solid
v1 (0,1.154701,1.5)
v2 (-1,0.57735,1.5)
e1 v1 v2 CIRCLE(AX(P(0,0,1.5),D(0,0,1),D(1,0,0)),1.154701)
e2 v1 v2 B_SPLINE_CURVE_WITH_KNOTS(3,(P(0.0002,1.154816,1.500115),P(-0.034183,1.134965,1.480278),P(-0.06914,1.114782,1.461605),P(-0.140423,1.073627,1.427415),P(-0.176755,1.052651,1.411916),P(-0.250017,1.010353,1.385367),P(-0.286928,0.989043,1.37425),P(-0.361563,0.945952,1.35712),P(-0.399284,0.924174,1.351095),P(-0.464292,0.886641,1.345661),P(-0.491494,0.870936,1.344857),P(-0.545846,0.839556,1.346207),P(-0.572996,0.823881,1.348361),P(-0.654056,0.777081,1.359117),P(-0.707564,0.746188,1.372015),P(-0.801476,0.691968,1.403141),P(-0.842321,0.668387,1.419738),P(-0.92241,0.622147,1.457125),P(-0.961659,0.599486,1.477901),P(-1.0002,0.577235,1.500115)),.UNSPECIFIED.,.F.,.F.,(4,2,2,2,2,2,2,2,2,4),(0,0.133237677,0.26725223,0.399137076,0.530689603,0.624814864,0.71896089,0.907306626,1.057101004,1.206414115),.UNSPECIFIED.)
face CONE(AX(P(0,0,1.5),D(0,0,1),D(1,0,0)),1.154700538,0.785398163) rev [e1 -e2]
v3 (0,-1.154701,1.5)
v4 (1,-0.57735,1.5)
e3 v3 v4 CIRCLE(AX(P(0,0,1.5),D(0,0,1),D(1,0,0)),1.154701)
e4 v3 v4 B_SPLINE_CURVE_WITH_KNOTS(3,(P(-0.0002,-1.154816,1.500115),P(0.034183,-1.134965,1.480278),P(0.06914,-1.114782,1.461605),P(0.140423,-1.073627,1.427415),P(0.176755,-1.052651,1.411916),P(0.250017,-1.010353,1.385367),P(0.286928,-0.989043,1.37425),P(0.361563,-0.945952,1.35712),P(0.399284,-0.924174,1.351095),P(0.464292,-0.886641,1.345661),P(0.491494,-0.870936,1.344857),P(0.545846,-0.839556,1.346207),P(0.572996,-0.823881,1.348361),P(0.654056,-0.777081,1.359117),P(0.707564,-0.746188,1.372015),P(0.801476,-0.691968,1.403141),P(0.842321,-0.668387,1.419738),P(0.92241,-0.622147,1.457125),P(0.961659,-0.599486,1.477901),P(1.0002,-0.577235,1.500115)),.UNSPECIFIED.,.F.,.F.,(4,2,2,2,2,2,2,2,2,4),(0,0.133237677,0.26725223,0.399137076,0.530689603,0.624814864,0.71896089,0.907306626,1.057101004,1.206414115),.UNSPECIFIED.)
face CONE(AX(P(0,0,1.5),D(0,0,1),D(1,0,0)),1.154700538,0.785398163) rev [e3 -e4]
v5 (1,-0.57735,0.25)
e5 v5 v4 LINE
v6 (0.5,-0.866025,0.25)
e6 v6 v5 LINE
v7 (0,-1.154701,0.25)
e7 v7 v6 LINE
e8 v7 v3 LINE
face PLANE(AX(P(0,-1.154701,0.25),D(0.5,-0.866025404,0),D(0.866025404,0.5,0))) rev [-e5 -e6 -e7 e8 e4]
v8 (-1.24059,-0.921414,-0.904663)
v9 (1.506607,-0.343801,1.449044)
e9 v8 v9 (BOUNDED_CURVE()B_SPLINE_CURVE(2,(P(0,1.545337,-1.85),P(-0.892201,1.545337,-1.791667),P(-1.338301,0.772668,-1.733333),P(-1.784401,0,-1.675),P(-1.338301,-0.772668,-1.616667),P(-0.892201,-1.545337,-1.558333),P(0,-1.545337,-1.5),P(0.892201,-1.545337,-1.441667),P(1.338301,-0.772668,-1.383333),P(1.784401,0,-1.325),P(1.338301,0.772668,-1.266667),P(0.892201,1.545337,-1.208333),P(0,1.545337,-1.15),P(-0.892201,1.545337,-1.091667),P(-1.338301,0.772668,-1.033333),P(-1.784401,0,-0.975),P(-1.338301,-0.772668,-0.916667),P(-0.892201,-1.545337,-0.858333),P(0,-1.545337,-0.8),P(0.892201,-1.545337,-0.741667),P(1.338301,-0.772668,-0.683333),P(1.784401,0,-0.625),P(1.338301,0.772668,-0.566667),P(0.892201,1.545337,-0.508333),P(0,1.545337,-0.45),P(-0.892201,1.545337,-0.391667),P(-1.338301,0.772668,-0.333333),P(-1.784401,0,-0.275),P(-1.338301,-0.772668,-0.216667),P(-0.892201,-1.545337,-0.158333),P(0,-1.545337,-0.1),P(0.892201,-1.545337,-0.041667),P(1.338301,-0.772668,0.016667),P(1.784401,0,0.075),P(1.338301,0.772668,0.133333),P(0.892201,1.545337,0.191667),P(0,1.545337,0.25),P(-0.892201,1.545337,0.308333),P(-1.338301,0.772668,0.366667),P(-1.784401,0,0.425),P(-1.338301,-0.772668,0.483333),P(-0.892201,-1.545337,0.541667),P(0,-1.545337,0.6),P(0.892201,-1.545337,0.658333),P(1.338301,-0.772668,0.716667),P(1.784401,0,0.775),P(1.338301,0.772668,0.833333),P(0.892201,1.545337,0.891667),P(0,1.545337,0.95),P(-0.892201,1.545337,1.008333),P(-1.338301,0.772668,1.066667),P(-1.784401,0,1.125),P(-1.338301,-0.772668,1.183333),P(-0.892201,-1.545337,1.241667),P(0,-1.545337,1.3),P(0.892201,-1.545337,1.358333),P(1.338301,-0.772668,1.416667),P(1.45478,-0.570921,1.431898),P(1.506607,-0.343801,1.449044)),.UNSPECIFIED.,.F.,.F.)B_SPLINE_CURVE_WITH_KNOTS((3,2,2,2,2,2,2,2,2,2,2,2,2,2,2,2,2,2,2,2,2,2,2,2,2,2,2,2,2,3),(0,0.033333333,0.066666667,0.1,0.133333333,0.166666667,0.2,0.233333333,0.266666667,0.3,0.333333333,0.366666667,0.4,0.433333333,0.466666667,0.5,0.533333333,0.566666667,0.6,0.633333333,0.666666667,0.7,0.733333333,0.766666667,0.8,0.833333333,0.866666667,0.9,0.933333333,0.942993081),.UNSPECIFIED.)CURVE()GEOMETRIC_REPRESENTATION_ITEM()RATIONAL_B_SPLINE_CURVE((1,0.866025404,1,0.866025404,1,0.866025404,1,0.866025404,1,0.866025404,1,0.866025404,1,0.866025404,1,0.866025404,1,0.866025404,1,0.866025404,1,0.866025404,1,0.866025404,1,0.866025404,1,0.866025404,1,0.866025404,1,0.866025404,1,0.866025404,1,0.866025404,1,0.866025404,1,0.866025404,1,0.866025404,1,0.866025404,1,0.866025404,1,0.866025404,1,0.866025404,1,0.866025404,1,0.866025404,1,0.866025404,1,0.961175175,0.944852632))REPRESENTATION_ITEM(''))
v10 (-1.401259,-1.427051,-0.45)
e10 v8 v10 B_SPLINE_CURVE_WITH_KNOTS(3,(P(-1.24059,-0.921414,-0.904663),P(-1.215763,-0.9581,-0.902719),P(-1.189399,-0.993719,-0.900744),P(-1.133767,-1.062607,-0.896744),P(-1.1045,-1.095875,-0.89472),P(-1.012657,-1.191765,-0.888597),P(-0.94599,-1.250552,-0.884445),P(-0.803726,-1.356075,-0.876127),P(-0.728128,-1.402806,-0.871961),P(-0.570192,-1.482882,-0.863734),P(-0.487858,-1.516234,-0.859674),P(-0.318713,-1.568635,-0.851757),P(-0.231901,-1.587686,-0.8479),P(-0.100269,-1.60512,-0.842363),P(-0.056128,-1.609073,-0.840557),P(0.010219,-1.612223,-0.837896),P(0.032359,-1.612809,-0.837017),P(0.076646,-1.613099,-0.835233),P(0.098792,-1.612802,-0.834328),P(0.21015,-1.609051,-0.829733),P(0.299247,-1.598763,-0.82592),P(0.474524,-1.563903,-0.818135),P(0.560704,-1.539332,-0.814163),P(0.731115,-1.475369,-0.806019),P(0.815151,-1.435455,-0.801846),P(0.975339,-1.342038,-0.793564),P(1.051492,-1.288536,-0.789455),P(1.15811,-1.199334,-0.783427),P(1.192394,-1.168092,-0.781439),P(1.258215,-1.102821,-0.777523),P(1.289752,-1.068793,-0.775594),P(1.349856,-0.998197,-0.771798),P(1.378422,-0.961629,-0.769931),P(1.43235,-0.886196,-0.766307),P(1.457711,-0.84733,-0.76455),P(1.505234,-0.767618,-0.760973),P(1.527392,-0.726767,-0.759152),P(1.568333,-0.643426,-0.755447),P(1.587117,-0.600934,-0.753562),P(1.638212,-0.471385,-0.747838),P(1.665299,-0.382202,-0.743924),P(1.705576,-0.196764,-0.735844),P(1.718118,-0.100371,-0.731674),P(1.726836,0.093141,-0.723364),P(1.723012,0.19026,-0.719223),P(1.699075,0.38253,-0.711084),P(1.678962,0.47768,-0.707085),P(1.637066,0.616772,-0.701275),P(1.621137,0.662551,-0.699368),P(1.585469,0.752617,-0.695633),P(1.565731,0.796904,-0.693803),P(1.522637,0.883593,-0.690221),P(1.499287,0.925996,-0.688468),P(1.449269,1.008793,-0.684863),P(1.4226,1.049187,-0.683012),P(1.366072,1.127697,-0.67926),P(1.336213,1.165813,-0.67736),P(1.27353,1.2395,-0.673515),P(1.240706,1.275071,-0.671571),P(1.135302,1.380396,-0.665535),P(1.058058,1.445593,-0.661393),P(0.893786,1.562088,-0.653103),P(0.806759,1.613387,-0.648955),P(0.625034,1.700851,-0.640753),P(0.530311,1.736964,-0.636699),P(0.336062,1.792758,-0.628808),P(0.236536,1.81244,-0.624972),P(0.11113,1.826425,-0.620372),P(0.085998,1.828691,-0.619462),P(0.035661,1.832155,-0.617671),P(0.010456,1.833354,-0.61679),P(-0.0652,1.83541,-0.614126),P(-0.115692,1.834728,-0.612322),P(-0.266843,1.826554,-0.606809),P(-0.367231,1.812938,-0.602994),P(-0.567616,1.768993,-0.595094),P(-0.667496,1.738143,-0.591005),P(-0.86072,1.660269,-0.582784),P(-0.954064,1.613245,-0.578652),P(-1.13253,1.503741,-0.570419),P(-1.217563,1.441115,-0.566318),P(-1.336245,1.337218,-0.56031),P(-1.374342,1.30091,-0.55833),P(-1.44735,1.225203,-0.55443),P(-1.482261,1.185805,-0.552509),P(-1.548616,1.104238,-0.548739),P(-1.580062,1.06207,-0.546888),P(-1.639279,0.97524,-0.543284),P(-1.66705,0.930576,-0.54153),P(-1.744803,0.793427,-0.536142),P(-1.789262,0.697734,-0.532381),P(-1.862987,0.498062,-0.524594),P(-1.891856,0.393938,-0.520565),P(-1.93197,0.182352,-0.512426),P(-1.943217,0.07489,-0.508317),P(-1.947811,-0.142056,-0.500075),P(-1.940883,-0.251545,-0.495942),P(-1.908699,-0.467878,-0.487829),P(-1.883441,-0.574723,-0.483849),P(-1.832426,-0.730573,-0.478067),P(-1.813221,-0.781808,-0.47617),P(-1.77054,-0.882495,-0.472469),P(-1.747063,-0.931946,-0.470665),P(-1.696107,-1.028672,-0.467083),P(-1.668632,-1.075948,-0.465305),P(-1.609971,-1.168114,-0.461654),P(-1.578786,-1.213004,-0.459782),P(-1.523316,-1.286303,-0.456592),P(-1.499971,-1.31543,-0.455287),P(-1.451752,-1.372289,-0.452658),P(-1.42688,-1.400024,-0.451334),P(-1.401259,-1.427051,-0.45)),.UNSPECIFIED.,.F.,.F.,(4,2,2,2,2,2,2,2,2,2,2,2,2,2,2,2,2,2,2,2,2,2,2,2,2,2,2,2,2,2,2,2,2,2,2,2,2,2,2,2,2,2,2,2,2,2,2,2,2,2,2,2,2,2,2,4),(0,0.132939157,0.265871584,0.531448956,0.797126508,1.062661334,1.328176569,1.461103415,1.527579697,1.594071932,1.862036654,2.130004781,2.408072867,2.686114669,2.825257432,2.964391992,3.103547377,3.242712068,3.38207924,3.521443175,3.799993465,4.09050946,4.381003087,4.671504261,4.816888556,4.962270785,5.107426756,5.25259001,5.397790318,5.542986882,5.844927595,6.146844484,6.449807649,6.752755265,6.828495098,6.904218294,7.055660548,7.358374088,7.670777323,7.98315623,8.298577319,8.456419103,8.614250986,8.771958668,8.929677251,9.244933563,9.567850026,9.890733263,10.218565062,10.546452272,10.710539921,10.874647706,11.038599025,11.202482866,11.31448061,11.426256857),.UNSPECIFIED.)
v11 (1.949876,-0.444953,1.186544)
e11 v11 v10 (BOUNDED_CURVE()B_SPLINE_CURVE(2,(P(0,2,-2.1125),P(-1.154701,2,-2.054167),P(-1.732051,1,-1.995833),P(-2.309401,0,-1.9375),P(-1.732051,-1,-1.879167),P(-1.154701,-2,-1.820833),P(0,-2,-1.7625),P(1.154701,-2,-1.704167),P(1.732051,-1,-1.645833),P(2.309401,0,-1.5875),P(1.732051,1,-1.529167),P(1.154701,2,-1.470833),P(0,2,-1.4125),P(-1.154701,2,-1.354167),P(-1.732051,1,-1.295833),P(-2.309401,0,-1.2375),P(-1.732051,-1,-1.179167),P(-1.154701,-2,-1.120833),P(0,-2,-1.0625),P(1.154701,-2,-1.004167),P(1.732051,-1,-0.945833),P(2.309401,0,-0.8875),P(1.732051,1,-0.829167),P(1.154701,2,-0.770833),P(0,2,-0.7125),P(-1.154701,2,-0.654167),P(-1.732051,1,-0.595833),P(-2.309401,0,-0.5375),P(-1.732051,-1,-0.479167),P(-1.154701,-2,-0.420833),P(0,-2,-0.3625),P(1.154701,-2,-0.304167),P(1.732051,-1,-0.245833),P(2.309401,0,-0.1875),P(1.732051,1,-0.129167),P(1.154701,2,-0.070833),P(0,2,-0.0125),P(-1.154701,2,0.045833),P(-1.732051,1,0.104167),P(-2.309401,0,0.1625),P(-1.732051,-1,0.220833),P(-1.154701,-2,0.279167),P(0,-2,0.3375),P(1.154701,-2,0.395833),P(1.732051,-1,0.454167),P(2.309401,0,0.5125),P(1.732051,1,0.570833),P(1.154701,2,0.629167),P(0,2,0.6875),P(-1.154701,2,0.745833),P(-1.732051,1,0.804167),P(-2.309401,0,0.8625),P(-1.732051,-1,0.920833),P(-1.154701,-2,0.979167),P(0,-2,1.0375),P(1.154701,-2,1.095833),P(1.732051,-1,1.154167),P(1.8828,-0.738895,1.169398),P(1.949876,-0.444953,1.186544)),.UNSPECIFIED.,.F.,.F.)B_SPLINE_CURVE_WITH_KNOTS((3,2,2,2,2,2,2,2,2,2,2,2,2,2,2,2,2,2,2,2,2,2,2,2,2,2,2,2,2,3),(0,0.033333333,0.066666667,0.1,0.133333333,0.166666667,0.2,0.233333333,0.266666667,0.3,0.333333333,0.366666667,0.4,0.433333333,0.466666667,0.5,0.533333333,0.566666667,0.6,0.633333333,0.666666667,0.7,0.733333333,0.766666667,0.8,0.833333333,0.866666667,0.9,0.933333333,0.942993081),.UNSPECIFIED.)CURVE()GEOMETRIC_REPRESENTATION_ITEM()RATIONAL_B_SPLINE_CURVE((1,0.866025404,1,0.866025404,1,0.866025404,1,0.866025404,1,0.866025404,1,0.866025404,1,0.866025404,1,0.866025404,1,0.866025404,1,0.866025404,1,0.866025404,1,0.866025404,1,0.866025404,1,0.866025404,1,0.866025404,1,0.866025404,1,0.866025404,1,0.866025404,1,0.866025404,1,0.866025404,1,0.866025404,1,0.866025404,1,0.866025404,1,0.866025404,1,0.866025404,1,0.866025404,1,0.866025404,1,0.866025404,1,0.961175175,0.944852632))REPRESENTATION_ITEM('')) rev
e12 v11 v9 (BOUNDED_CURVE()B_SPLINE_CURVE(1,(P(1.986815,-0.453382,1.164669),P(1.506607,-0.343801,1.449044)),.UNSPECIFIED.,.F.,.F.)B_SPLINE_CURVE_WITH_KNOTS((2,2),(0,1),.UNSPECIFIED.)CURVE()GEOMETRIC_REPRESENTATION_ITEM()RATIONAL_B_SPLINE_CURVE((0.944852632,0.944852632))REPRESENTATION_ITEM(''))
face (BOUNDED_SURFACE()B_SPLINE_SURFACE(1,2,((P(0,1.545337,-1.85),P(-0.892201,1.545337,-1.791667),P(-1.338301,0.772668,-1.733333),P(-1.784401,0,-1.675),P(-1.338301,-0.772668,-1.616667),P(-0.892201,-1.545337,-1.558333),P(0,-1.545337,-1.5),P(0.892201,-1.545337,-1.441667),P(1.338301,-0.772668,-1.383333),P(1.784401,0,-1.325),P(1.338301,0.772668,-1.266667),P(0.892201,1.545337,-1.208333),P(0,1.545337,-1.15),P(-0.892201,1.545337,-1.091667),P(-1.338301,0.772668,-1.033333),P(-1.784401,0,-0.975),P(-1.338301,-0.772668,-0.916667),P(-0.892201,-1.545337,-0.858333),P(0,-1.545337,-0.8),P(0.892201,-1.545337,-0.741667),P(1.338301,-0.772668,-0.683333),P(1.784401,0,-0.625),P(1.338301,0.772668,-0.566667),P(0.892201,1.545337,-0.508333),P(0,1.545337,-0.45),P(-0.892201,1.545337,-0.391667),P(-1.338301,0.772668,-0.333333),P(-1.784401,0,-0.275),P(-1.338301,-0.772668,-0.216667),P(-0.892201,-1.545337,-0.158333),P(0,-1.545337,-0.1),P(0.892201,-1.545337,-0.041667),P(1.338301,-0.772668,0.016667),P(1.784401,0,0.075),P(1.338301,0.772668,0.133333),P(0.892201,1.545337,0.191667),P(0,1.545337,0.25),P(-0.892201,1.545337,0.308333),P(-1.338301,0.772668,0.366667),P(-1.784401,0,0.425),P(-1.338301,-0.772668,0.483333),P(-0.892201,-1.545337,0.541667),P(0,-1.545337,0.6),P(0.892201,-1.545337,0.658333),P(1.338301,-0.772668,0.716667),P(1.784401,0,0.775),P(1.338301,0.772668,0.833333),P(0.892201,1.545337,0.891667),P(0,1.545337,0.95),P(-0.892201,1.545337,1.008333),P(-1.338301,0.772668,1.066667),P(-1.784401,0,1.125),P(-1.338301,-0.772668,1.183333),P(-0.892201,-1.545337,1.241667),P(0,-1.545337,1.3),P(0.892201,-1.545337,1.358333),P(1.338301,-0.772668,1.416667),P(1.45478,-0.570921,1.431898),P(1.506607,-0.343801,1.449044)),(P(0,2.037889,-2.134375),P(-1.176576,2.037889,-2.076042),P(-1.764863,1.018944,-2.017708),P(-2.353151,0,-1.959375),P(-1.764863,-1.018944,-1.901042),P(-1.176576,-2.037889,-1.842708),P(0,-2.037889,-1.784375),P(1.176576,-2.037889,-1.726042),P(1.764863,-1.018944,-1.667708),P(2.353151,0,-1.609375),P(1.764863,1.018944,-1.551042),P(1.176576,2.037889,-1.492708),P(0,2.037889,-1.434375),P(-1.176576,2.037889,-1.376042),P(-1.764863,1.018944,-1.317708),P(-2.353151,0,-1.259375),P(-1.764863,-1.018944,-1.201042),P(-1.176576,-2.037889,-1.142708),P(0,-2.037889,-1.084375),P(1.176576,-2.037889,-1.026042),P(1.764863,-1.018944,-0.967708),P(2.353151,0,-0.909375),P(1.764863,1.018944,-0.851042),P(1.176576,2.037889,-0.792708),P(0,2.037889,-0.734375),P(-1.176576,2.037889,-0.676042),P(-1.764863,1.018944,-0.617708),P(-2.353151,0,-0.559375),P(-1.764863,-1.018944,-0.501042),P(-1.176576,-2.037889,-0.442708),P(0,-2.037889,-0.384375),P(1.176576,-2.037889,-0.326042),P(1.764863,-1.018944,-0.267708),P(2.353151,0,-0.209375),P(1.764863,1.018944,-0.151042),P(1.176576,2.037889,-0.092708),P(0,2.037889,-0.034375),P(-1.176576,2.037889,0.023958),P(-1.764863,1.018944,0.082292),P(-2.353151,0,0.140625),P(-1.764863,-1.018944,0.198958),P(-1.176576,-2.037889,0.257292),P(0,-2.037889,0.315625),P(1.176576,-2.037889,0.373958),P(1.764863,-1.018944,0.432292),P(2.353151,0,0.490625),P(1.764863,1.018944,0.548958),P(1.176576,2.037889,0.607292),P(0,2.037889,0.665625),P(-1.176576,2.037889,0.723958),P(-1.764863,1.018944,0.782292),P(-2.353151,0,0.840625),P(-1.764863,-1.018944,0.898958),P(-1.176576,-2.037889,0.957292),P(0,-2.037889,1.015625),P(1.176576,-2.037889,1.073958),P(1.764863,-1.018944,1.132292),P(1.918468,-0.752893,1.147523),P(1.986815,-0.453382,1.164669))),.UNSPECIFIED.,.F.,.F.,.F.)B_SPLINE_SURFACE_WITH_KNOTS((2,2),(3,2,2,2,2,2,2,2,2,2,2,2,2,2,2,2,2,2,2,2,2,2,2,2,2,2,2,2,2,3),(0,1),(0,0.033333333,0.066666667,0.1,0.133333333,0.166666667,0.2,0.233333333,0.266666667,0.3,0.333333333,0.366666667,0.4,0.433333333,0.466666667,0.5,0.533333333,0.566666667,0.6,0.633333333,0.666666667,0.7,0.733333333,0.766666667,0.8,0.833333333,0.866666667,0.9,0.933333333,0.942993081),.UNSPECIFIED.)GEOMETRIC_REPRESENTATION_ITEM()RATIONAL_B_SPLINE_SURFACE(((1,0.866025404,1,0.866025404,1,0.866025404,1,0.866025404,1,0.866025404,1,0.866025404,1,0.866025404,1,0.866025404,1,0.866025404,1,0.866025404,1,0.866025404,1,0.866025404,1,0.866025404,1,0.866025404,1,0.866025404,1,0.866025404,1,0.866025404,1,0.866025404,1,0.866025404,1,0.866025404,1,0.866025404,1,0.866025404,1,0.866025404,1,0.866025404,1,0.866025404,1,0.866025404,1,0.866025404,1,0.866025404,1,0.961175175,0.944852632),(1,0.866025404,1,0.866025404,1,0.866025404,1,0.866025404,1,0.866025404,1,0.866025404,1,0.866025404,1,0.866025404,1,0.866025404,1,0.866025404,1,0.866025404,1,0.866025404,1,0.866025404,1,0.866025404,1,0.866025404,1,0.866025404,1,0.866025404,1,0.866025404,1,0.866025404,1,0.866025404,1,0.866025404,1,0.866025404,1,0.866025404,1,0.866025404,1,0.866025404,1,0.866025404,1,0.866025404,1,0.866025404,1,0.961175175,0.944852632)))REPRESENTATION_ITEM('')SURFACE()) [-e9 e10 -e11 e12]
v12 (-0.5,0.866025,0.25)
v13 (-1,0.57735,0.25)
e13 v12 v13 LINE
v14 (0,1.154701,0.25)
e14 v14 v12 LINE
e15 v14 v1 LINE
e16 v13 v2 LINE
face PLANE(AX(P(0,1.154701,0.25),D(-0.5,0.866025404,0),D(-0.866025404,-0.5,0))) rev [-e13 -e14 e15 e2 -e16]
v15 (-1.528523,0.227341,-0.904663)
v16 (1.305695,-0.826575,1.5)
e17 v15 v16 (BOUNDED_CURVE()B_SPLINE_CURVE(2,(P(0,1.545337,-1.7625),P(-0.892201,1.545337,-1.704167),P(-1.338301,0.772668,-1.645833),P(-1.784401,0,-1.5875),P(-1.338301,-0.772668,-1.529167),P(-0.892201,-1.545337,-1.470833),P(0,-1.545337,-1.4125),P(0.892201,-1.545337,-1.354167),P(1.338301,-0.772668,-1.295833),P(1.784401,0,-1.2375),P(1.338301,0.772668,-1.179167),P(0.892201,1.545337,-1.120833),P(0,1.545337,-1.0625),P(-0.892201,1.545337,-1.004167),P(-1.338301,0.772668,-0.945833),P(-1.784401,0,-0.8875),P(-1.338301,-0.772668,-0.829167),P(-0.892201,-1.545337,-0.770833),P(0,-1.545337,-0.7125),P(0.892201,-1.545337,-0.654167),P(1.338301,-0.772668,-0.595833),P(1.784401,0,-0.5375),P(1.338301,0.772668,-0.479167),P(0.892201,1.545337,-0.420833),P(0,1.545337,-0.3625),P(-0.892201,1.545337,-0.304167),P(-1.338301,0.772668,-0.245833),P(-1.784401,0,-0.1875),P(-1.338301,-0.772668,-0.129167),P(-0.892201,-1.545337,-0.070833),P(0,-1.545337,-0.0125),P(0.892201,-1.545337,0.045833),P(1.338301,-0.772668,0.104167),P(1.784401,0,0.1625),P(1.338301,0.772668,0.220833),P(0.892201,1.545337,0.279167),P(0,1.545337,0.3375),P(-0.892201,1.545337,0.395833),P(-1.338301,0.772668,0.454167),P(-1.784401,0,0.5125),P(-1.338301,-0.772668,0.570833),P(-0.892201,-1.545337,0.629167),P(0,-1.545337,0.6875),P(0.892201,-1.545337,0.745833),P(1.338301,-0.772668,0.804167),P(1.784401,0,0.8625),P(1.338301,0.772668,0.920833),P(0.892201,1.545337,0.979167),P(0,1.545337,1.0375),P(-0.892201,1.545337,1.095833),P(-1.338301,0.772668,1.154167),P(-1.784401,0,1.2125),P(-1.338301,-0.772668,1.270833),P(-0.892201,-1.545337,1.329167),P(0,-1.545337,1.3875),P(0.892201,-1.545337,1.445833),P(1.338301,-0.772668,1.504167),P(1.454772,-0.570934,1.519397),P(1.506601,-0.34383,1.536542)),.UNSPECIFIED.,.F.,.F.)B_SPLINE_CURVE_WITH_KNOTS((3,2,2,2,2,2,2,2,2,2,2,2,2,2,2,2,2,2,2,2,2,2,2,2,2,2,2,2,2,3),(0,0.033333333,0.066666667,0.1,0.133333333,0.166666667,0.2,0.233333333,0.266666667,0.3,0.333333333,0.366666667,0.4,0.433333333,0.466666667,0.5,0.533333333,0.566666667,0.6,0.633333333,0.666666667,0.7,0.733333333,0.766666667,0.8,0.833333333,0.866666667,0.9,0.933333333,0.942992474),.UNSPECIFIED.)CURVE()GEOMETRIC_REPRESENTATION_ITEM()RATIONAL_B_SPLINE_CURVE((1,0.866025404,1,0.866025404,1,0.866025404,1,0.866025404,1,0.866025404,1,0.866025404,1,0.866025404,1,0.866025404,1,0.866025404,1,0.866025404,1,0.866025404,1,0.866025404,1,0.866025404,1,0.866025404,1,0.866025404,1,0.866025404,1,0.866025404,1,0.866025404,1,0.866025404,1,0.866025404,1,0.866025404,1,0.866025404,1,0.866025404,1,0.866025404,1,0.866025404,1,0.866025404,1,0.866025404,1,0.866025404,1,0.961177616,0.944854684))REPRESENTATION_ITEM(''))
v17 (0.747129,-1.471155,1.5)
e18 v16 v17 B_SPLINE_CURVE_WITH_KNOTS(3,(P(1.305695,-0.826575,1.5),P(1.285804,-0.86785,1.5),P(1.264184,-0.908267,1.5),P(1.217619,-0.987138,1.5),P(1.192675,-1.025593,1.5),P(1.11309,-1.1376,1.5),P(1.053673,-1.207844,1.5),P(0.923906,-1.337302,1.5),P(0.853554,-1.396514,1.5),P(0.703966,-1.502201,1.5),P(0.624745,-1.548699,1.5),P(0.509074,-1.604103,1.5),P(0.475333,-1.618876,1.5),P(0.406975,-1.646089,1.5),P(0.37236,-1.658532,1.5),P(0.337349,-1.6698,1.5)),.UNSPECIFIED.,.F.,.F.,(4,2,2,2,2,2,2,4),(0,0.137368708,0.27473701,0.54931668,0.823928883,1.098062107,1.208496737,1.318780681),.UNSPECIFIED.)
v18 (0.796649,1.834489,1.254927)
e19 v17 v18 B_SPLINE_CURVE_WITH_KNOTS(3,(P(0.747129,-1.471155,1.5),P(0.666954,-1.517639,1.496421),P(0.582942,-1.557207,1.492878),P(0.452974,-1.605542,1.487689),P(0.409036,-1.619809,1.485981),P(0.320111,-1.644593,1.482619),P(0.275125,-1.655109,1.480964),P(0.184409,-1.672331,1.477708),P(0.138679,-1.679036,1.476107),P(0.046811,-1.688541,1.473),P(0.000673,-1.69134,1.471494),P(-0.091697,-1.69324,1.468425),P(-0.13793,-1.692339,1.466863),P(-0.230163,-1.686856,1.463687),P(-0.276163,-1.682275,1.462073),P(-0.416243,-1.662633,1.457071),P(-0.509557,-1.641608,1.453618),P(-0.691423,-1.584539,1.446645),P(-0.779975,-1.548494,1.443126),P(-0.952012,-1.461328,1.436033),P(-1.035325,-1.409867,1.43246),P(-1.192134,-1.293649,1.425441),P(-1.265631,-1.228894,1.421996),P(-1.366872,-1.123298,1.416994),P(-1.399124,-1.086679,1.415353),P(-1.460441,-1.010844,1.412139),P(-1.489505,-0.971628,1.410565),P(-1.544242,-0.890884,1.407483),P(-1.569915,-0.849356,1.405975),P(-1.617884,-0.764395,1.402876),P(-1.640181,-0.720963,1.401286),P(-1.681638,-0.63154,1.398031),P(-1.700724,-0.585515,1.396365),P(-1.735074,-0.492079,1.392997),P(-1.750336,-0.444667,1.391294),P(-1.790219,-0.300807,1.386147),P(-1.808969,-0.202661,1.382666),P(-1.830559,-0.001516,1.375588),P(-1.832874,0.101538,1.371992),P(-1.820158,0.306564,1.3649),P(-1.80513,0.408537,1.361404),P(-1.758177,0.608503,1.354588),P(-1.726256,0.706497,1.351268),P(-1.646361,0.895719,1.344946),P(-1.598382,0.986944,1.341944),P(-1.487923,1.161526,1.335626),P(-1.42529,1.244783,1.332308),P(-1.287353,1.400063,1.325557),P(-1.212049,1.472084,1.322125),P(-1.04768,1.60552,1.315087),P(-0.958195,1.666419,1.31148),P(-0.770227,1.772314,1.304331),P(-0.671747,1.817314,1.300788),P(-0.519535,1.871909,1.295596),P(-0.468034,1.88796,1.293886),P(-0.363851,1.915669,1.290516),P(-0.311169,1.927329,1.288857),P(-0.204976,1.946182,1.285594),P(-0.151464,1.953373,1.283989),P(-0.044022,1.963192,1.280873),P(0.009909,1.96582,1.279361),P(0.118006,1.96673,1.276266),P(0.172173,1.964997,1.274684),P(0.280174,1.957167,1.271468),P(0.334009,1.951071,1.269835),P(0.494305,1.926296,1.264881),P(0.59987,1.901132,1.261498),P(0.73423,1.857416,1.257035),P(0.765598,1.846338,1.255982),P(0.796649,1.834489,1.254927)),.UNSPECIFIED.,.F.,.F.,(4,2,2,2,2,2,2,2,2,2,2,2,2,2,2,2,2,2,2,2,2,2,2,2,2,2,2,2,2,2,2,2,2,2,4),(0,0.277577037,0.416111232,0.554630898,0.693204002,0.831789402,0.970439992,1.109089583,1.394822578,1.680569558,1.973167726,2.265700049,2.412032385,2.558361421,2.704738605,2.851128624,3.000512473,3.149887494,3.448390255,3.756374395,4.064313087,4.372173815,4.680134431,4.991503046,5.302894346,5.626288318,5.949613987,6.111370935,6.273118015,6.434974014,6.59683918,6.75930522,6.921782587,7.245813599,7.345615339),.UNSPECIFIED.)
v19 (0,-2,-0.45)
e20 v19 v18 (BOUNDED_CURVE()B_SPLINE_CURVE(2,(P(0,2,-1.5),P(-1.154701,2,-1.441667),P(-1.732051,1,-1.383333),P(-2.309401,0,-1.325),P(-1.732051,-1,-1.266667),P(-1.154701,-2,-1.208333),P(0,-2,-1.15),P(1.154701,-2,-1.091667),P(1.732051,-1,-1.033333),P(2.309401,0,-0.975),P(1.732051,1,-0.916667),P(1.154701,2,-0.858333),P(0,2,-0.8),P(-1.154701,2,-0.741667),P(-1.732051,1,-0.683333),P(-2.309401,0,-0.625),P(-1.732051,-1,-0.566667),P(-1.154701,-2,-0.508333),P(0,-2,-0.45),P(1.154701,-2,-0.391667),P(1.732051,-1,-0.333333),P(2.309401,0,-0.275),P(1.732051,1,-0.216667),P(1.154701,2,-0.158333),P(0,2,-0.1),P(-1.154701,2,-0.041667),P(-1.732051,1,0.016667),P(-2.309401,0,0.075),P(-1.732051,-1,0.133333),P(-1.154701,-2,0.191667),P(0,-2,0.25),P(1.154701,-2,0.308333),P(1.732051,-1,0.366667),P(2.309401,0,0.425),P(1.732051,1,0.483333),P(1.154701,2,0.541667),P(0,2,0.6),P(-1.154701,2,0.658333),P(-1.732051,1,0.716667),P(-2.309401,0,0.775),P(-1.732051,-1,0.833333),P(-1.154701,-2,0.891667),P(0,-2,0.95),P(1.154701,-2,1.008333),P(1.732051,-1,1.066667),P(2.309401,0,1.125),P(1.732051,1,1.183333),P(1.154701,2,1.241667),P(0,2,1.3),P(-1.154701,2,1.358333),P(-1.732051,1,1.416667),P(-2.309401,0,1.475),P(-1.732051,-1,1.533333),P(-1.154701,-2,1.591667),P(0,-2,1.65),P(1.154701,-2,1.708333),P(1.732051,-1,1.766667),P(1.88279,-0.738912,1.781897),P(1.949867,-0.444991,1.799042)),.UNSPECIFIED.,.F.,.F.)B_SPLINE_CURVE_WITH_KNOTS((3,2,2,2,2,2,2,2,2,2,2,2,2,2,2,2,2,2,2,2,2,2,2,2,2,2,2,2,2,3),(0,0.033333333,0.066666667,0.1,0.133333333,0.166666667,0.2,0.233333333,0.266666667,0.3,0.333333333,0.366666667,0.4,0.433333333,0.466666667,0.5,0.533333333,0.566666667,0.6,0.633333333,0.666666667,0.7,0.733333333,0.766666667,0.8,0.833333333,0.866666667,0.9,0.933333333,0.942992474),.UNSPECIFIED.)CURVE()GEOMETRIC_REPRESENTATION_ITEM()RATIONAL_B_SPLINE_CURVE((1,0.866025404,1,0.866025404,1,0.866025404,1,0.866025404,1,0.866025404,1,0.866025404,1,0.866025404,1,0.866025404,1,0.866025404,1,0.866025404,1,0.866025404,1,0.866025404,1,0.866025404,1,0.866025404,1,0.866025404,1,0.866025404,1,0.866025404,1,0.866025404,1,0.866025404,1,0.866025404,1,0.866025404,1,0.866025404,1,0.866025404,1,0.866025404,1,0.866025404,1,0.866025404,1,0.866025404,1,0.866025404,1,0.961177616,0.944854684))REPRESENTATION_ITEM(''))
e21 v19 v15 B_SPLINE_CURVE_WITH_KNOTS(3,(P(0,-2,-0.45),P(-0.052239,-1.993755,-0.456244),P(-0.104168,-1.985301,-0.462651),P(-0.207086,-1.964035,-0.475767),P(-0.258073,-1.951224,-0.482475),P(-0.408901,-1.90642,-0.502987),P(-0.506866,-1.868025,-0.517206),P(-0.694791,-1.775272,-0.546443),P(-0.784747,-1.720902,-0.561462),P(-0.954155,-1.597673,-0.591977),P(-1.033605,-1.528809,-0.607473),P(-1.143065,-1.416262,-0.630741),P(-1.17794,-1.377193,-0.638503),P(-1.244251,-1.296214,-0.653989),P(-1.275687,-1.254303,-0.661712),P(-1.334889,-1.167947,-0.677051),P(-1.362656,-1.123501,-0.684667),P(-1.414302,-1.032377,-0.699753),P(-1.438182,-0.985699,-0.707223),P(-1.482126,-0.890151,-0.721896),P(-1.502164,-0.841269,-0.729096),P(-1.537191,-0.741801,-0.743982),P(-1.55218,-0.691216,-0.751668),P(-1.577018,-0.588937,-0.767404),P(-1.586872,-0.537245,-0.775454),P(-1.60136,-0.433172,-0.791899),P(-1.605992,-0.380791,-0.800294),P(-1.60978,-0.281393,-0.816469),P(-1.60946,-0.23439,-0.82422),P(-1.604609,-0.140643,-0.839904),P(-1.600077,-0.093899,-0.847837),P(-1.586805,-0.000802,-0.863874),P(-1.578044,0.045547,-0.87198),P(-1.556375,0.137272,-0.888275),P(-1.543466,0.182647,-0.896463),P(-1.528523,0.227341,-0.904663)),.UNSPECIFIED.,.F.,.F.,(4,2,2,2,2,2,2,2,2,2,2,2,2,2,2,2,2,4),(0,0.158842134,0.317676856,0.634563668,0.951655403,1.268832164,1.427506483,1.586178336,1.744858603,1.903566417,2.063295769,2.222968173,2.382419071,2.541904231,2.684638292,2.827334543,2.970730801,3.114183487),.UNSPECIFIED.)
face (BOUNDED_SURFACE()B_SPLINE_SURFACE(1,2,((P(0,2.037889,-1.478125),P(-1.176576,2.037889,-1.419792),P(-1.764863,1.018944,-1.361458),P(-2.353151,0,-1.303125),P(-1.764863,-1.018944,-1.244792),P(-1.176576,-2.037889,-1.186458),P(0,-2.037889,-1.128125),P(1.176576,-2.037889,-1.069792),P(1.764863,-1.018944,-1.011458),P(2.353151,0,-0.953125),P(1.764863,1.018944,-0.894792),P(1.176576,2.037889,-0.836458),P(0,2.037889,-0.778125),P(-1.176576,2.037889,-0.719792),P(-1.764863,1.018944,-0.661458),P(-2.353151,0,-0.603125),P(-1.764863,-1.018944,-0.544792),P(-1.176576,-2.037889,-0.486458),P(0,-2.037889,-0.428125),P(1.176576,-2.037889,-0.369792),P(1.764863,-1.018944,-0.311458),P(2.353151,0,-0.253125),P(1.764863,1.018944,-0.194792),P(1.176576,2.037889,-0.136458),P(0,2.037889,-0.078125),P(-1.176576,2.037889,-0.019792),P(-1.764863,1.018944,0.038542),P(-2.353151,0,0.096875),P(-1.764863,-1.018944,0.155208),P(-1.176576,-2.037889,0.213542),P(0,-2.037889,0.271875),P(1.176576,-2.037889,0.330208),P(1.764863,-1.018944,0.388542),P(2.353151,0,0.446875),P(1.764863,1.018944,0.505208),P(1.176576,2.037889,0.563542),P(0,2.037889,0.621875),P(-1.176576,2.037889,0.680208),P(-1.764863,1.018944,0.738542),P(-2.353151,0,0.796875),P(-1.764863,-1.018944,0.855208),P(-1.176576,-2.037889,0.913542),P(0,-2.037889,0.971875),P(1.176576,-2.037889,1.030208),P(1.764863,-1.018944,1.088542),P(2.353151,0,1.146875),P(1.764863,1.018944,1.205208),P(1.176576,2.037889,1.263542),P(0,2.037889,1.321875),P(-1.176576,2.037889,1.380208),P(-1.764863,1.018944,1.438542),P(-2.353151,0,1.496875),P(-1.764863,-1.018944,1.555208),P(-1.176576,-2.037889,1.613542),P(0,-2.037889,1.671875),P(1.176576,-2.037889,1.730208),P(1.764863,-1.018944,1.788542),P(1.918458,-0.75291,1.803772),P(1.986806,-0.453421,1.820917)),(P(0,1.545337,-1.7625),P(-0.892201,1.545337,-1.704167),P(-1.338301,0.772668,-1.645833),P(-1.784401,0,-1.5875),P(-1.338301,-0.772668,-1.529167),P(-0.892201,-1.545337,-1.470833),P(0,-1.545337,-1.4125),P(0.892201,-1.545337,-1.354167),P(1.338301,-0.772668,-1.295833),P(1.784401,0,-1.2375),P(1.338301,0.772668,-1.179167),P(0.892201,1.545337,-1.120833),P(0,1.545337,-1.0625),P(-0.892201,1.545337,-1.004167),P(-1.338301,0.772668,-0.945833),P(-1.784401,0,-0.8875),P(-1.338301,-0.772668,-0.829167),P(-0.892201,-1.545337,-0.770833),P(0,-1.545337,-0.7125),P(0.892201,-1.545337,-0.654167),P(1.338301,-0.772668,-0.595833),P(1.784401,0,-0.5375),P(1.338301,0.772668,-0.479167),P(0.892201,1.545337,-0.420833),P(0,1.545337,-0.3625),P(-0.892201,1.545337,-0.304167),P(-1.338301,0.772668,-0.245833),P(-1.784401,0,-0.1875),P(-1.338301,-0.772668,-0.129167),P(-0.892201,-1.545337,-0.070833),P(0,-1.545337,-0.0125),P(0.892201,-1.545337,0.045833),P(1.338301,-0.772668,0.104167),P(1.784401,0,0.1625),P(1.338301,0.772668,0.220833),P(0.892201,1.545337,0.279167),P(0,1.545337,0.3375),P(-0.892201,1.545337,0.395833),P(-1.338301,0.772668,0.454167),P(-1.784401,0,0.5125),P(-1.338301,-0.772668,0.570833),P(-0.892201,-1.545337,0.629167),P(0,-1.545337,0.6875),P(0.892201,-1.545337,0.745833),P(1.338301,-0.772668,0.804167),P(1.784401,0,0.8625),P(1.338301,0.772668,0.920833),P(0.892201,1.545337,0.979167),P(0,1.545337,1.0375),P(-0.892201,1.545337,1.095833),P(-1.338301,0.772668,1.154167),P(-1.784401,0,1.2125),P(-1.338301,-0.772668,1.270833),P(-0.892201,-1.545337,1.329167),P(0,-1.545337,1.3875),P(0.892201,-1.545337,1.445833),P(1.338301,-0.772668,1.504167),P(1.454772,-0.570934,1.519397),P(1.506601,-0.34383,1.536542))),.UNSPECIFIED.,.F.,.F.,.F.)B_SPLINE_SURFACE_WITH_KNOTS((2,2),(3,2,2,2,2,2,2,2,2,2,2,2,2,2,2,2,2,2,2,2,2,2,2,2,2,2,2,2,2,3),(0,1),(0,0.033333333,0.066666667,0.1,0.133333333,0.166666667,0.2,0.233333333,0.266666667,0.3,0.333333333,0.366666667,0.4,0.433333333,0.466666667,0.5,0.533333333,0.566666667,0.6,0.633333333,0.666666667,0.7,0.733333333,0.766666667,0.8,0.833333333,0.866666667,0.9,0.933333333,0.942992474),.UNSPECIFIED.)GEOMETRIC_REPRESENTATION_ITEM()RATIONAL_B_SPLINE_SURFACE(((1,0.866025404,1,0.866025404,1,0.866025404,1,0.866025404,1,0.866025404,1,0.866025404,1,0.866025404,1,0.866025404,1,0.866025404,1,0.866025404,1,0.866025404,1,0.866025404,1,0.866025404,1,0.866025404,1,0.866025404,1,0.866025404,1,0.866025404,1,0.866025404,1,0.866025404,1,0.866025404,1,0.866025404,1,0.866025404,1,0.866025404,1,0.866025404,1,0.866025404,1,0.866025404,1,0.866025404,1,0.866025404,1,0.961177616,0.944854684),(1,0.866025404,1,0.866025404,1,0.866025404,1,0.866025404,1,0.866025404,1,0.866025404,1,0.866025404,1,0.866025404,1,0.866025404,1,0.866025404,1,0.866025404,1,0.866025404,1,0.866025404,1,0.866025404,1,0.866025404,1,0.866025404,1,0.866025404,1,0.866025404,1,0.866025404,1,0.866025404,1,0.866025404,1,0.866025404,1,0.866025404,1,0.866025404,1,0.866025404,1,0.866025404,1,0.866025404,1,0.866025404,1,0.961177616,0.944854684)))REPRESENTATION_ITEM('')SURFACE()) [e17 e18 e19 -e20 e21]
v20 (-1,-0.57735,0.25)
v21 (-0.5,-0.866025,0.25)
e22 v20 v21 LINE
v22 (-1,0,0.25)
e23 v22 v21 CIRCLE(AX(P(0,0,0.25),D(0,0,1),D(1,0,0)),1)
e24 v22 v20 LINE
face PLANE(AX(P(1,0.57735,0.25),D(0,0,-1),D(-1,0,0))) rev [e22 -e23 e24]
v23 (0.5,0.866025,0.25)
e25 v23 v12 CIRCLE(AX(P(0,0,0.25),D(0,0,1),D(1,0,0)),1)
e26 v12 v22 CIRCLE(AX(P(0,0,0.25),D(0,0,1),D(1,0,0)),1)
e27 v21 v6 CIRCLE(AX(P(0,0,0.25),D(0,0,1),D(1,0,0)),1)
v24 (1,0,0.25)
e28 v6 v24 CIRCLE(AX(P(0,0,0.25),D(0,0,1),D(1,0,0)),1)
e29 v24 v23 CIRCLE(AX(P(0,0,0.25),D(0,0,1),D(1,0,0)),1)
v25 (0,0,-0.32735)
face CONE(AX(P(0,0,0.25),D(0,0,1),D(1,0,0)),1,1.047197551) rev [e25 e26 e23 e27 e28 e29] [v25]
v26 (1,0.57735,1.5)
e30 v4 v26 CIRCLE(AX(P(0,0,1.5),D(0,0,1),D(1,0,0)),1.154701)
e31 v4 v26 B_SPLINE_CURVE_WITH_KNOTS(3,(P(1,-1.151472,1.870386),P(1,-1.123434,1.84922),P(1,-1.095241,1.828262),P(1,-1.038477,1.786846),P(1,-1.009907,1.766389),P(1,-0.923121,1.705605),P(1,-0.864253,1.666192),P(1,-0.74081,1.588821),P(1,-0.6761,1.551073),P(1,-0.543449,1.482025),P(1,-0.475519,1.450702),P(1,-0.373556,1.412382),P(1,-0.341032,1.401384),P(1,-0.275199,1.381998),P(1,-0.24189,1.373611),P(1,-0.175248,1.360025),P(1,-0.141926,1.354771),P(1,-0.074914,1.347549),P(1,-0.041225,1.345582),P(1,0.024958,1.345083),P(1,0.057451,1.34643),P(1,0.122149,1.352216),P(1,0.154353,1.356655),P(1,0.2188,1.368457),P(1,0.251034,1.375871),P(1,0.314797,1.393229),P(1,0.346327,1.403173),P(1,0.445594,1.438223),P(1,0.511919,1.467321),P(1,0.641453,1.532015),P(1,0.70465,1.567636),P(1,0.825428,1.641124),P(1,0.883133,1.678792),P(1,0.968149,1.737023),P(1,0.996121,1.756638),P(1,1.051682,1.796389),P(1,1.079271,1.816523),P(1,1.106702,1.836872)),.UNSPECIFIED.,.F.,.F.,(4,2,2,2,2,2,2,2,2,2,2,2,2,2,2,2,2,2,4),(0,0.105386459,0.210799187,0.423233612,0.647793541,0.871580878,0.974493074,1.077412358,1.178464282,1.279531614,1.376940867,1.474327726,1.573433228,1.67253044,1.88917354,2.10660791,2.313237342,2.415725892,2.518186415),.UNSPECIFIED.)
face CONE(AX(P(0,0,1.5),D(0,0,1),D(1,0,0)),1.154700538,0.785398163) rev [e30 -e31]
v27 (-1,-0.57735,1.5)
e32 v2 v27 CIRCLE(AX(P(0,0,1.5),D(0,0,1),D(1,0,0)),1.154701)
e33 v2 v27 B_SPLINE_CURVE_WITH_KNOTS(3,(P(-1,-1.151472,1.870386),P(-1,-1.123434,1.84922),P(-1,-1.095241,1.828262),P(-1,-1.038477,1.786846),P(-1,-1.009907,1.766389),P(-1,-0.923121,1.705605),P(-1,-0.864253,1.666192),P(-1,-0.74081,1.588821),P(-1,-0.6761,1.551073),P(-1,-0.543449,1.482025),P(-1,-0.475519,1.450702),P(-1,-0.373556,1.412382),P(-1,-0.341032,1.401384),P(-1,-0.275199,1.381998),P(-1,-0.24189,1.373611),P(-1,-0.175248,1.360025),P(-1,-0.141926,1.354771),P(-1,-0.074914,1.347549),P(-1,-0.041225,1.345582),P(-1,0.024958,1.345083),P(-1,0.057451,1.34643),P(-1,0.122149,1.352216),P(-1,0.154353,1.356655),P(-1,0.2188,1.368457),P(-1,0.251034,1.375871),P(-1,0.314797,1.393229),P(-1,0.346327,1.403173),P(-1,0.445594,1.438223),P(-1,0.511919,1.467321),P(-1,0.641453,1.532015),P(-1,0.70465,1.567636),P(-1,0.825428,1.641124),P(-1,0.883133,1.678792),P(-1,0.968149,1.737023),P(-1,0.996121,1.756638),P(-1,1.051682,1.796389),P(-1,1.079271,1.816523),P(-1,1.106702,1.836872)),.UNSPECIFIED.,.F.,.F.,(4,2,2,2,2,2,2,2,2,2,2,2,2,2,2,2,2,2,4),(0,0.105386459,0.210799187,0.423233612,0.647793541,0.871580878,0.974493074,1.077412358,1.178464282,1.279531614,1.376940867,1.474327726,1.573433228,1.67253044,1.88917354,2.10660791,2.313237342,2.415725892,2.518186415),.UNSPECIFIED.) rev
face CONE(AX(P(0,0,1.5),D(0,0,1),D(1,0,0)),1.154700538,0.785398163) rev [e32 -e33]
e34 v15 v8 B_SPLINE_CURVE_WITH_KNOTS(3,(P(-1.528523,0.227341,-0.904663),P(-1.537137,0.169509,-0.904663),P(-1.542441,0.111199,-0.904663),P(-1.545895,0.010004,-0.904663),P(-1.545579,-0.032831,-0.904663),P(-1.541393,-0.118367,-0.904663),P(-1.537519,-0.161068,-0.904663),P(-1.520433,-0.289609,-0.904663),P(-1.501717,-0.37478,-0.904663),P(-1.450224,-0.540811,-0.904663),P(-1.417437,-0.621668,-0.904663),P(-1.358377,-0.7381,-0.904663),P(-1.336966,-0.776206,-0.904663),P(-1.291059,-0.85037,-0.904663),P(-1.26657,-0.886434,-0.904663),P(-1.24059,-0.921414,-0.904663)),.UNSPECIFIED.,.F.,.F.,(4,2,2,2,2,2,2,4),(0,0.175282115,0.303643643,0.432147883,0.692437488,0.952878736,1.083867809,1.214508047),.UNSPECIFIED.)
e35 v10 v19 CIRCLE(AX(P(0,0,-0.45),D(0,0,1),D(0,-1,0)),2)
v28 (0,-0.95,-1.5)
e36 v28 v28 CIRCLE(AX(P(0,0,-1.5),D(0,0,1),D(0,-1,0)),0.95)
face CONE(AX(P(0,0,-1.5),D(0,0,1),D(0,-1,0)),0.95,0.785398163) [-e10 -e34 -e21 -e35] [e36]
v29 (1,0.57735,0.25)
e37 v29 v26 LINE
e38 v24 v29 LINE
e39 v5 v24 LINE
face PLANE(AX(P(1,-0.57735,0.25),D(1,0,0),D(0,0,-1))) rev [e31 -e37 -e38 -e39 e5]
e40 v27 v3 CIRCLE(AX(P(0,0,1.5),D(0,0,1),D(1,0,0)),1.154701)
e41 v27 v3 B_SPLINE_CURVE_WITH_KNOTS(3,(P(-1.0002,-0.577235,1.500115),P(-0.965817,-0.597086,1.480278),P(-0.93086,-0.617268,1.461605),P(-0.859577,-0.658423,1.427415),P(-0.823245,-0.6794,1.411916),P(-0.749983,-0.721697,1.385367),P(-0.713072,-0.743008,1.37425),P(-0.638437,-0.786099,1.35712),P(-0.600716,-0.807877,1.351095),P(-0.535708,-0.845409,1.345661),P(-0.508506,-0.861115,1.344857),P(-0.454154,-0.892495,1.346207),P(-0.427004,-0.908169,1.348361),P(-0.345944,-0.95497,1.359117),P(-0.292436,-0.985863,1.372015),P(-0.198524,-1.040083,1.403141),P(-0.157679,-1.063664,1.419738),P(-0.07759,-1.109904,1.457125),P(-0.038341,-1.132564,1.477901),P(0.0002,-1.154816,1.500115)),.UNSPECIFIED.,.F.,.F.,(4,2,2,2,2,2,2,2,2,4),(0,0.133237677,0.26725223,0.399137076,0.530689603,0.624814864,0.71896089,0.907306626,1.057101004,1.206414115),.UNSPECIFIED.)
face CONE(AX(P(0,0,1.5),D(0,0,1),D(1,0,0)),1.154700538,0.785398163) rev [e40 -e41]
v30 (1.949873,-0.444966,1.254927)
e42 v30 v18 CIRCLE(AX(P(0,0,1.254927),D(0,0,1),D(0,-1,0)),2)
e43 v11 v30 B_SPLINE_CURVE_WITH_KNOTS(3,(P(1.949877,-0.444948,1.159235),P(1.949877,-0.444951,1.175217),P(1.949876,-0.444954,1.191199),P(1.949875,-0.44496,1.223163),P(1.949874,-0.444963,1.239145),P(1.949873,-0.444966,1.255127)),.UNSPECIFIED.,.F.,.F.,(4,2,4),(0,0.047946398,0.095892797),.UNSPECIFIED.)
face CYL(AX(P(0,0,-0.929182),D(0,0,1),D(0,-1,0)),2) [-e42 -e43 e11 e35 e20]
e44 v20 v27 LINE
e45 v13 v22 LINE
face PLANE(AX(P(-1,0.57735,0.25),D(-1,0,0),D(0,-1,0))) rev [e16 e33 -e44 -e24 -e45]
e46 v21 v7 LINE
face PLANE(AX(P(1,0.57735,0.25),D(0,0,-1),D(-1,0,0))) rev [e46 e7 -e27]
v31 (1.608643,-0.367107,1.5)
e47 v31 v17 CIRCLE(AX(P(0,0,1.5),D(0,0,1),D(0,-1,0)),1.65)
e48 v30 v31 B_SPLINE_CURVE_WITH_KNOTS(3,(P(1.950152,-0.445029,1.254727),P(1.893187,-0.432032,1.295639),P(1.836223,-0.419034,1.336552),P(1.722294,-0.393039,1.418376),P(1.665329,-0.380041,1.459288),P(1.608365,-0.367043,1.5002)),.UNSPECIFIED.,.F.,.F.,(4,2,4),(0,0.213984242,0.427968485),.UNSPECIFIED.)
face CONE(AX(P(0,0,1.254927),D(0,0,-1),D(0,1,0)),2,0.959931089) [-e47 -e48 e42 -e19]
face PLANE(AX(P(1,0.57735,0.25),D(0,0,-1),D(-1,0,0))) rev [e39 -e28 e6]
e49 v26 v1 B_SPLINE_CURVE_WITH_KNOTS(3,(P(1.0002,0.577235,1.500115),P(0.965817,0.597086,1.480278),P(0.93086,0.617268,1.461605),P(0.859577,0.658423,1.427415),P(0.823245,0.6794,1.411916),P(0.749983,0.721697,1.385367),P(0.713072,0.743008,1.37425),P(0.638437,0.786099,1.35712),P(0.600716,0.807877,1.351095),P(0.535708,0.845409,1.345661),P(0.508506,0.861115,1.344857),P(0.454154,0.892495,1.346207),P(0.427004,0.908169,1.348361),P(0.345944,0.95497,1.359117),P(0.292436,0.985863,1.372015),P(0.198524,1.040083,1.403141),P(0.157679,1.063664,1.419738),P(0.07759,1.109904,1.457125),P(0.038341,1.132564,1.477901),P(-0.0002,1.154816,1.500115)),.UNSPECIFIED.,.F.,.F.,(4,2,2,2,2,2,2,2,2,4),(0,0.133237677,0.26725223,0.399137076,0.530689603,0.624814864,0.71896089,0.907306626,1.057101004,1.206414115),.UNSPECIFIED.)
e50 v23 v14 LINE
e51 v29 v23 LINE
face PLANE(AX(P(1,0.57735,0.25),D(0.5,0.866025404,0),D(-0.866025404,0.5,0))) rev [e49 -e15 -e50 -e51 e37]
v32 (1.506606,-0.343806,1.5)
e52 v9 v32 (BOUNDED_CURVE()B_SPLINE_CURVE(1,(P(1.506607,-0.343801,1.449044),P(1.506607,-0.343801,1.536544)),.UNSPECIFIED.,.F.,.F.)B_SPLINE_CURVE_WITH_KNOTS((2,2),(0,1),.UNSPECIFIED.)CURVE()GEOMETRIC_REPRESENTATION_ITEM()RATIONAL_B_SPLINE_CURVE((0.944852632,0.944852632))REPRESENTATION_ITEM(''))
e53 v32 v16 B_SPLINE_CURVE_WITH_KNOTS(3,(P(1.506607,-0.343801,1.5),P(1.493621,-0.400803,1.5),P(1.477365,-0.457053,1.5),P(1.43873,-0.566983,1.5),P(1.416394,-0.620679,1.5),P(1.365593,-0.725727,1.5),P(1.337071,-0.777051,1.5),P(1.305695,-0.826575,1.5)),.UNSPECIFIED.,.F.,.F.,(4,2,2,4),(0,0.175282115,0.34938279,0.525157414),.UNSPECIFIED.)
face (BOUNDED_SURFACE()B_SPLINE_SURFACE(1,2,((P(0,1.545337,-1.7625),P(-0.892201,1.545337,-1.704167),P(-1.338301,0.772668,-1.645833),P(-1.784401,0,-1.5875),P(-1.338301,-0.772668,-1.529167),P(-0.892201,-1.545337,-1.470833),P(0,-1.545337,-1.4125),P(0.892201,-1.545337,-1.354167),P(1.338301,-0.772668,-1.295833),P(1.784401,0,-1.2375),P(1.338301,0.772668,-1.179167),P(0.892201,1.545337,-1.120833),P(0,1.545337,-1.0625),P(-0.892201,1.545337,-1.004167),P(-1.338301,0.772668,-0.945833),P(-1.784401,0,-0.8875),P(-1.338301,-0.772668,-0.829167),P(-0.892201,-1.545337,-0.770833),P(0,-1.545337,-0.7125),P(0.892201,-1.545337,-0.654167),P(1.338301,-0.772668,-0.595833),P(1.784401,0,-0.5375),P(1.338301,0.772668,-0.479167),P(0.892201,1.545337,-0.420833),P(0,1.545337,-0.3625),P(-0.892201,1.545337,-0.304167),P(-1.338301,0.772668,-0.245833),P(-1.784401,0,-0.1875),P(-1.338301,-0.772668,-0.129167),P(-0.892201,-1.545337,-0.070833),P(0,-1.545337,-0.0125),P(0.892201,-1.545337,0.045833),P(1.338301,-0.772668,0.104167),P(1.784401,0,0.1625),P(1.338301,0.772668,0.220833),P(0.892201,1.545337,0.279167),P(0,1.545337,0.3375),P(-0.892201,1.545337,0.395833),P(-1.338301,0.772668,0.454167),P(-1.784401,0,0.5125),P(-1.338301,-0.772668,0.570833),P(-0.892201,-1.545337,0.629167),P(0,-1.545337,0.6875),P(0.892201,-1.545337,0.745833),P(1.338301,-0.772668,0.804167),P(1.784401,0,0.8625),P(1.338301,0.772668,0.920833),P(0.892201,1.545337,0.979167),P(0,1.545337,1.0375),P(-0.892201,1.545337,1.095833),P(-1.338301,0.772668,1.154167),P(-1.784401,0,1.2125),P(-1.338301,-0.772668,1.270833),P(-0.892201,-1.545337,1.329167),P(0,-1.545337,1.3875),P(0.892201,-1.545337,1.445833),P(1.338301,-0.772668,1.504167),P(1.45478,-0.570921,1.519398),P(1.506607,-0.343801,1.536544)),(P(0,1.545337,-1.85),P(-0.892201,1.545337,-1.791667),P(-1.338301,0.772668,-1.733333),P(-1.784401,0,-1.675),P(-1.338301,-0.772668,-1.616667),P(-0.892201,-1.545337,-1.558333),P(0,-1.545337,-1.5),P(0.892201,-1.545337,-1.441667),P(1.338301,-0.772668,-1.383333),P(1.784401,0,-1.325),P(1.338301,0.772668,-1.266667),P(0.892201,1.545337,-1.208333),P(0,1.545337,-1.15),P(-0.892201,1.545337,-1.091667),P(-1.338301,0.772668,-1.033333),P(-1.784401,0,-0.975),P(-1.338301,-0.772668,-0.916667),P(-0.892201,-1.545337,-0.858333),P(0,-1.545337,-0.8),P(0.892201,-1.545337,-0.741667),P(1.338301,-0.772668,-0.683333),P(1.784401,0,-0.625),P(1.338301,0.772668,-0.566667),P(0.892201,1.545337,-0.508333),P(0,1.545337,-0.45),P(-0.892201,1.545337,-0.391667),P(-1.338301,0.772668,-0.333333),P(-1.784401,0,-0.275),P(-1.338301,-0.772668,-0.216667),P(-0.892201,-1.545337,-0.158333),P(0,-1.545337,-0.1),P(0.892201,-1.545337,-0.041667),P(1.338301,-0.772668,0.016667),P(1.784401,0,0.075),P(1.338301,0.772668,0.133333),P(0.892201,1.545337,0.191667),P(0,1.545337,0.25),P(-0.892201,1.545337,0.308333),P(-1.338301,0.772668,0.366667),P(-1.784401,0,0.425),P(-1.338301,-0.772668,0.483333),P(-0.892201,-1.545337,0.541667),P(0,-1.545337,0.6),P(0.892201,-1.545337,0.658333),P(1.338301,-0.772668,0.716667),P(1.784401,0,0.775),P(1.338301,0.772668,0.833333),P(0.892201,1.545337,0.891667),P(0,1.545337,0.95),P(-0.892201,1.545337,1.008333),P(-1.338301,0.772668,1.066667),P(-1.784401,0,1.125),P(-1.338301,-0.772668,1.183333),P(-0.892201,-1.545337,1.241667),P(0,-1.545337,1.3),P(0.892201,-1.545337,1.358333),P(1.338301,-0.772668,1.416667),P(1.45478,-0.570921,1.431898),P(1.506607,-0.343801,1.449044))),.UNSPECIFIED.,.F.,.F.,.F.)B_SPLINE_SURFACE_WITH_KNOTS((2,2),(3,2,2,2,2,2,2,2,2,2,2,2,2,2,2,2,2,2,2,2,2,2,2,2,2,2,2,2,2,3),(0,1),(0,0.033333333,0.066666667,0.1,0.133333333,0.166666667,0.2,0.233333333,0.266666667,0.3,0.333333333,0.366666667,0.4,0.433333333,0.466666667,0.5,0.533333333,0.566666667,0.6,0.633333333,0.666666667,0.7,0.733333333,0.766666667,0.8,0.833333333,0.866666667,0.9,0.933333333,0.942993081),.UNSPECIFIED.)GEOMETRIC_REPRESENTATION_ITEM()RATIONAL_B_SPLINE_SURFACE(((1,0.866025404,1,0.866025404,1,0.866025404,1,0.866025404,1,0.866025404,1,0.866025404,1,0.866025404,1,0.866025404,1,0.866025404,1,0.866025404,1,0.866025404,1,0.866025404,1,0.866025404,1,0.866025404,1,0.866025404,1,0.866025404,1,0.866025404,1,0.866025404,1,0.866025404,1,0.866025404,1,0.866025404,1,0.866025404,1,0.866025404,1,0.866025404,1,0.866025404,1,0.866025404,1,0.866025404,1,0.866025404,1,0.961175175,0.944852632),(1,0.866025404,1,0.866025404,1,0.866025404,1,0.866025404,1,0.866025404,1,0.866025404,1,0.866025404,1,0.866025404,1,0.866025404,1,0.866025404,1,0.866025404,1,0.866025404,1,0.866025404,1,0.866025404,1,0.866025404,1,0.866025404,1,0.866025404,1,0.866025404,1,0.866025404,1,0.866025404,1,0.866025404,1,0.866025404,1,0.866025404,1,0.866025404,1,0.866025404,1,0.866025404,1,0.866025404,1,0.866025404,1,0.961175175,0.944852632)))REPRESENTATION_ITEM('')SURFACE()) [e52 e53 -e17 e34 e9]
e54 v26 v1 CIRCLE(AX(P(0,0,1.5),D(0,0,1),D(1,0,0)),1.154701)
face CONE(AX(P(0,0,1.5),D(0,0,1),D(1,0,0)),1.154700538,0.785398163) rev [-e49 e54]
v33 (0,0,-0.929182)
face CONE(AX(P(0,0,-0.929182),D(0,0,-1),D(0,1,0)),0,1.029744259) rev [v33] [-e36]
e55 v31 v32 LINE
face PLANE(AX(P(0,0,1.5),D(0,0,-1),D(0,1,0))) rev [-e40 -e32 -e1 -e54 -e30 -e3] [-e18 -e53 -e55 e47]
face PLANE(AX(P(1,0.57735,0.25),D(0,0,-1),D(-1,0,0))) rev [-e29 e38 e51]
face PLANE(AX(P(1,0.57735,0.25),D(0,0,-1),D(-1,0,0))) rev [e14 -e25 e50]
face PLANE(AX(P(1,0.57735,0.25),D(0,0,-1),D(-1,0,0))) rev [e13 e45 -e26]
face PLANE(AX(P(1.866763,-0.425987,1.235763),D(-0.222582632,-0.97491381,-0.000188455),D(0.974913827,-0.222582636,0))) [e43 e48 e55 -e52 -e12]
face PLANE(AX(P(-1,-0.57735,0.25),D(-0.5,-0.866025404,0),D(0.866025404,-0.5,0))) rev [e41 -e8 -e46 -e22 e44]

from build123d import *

# Parameters (mm, degrees)
CUT_EXTRUDE1_DEPTH = 1.25
CUT_SWEEP1_PITCH   = 0.7


with BuildPart() as part:
    # Sketch11 → Revolve1 (revolve)
    with BuildSketch(Plane(origin=(0, 0, 0), x_dir=(0, 0, -1), z_dir=(1, 0, 0)), mode=Mode.PRIVATE) as revolve1_sk:
        Polygon((-1.5, 0), (-1.5, 1.65), (-1.254927362, 2), (0.45, 2), (1.5, 0.95), (0.929182412, 0), align=None)
    revolve(revolve1_sk.sketch.rotate(Axis((0, 0, -0.929182412), (0, 0, -1)), 180), axis=Axis((0, 0, -0.929182412), (0, 0, -1)))

    # Sketch2 → Cut-Extrude1 (cut)
    with BuildSketch(Plane.XY.offset(1.5)):
        Polygon((0, 1.154700538), (-1, 0.577350269), (-1, -0.577350269), (0, -1.154700538), (1, -0.577350269), (1, 0.577350269), align=None)
    extrude(amount=-CUT_EXTRUDE1_DEPTH, mode=Mode.SUBTRACT)

    # Cut-Extrude2 cone 1 section (through the dimple's axis) → Cut-Extrude2 (revolve, cut)
    with BuildSketch(Plane(origin=(0, 0, 1.5), x_dir=(0, -1, 0), z_dir=(1, 0, 0))):
        Polygon((0, 0), (1.154700538, 0), (0, 1.154700538), align=None)
    revolve(axis=Axis((0, 0, 1.5), (0, 0, -1)), mode=Mode.SUBTRACT)

    # Cut-Extrude3 cone 1 section (through the dimple's axis) → Cut-Extrude3 (revolve, cut)
    with BuildSketch(Plane(origin=(0, 0, 0.25), x_dir=(0, -1, 0), z_dir=(1, 0, 0))):
        Polygon((0, 0), (1, 0), (0, 0.577350269), align=None)
    revolve(axis=Axis((0, 0, 0.25), (0, 0, -1)), mode=Mode.SUBTRACT)

    # Cut-Sweep1: the profile of Sketch6 screwed along a right-hand helix of 4.714286 turns, 6 arcs to a turn; built about Z, then put on its axis
    cut_sweep1_z = Axis((0, 0, 0), (0, 0, 1))
    cut_sweep1_corners = [(2.037888611, 0, 0.021875), (2.037888611, 0, -0.634375), (1.545336663, 0, -0.35), (1.545336663, 0, -0.2625)]
    with BuildLine(mode=Mode.PRIVATE) as cut_sweep1_profile:
        Line(cut_sweep1_corners[0], cut_sweep1_corners[1])
        Line(cut_sweep1_corners[1], cut_sweep1_corners[2])
        Line(cut_sweep1_corners[2], cut_sweep1_corners[3])
        Line(cut_sweep1_corners[3], cut_sweep1_corners[0])
    cut_sweep1_cap = Face(cut_sweep1_profile.wire())
    cut_sweep1_turn_angles = [0, 30, 60, 90, 120, 150, 180, 210, 240, 270, 300, 330, 360]
    cut_sweep1_turn_weights = [1, 0.8660254037844387, 1, 0.8660254037844387, 1, 0.8660254037844387, 1, 0.8660254037844387, 1, 0.8660254037844387, 1, 0.8660254037844387, 1]
    cut_sweep1_turn_rails = [Edge.make_bspline([Vector(p[0], p[1], 0).rotate(cut_sweep1_z, cut_sweep1_turn_angles[k]) / cut_sweep1_turn_weights[k] + Vector(0, 0, p[2] + CUT_SWEEP1_PITCH * cut_sweep1_turn_angles[k] / 360) for k in range(13)], [0, 0, 0, 1, 1, 2, 2, 3, 3, 4, 4, 5, 5, 6, 6, 6], 2, cut_sweep1_turn_weights) for p in cut_sweep1_corners]
    cut_sweep1_turn_sides = [Face.make_surface_from_curves(cut_sweep1_turn_rails[p[0]], cut_sweep1_turn_rails[p[1]]) for p in [(0, 1), (1, 2), (2, 3), (3, 0)]]
    cut_sweep1_last_angles = [1440, 1470, 1500, 1530, 1560, 1590, 1620, 1650, 1680, 1688.571428571, 1697.142857143]
    cut_sweep1_last_weights = [1, 0.8660254037844387, 1, 0.8660254037844387, 1, 0.8660254037844387, 1, 0.8660254037844387, 1, 0.9888308262251233, 1]
    cut_sweep1_last_rails = [Edge.make_bspline([Vector(p[0], p[1], 0).rotate(cut_sweep1_z, cut_sweep1_last_angles[k]) / cut_sweep1_last_weights[k] + Vector(0, 0, p[2] + CUT_SWEEP1_PITCH * cut_sweep1_last_angles[k] / 360) for k in range(11)], [0, 0, 0, 1, 1, 2, 2, 3, 3, 4, 4, 5, 5, 5], 2, cut_sweep1_last_weights) for p in cut_sweep1_corners]
    cut_sweep1_last_sides = [Face.make_surface_from_curves(cut_sweep1_last_rails[p[0]], cut_sweep1_last_rails[p[1]]) for p in [(0, 1), (1, 2), (2, 3), (3, 0)]]
    cut_sweep1 = Plane(origin=(0, 0, -1.5), x_dir=(0, 1, 0), z_dir=(0, 0, 1)) * Solid(Shell([*[p.moved(Location((0, 0, CUT_SWEEP1_PITCH * i))) for i in range(4) for p in cut_sweep1_turn_sides], *cut_sweep1_last_sides, cut_sweep1_cap, cut_sweep1_cap.rotate(cut_sweep1_z, 1697.142857143).moved(Location((0, 0, CUT_SWEEP1_PITCH * 1697.142857143 / 360)))]))
    add(cut_sweep1, mode=Mode.SUBTRACT)


solid = part.part
